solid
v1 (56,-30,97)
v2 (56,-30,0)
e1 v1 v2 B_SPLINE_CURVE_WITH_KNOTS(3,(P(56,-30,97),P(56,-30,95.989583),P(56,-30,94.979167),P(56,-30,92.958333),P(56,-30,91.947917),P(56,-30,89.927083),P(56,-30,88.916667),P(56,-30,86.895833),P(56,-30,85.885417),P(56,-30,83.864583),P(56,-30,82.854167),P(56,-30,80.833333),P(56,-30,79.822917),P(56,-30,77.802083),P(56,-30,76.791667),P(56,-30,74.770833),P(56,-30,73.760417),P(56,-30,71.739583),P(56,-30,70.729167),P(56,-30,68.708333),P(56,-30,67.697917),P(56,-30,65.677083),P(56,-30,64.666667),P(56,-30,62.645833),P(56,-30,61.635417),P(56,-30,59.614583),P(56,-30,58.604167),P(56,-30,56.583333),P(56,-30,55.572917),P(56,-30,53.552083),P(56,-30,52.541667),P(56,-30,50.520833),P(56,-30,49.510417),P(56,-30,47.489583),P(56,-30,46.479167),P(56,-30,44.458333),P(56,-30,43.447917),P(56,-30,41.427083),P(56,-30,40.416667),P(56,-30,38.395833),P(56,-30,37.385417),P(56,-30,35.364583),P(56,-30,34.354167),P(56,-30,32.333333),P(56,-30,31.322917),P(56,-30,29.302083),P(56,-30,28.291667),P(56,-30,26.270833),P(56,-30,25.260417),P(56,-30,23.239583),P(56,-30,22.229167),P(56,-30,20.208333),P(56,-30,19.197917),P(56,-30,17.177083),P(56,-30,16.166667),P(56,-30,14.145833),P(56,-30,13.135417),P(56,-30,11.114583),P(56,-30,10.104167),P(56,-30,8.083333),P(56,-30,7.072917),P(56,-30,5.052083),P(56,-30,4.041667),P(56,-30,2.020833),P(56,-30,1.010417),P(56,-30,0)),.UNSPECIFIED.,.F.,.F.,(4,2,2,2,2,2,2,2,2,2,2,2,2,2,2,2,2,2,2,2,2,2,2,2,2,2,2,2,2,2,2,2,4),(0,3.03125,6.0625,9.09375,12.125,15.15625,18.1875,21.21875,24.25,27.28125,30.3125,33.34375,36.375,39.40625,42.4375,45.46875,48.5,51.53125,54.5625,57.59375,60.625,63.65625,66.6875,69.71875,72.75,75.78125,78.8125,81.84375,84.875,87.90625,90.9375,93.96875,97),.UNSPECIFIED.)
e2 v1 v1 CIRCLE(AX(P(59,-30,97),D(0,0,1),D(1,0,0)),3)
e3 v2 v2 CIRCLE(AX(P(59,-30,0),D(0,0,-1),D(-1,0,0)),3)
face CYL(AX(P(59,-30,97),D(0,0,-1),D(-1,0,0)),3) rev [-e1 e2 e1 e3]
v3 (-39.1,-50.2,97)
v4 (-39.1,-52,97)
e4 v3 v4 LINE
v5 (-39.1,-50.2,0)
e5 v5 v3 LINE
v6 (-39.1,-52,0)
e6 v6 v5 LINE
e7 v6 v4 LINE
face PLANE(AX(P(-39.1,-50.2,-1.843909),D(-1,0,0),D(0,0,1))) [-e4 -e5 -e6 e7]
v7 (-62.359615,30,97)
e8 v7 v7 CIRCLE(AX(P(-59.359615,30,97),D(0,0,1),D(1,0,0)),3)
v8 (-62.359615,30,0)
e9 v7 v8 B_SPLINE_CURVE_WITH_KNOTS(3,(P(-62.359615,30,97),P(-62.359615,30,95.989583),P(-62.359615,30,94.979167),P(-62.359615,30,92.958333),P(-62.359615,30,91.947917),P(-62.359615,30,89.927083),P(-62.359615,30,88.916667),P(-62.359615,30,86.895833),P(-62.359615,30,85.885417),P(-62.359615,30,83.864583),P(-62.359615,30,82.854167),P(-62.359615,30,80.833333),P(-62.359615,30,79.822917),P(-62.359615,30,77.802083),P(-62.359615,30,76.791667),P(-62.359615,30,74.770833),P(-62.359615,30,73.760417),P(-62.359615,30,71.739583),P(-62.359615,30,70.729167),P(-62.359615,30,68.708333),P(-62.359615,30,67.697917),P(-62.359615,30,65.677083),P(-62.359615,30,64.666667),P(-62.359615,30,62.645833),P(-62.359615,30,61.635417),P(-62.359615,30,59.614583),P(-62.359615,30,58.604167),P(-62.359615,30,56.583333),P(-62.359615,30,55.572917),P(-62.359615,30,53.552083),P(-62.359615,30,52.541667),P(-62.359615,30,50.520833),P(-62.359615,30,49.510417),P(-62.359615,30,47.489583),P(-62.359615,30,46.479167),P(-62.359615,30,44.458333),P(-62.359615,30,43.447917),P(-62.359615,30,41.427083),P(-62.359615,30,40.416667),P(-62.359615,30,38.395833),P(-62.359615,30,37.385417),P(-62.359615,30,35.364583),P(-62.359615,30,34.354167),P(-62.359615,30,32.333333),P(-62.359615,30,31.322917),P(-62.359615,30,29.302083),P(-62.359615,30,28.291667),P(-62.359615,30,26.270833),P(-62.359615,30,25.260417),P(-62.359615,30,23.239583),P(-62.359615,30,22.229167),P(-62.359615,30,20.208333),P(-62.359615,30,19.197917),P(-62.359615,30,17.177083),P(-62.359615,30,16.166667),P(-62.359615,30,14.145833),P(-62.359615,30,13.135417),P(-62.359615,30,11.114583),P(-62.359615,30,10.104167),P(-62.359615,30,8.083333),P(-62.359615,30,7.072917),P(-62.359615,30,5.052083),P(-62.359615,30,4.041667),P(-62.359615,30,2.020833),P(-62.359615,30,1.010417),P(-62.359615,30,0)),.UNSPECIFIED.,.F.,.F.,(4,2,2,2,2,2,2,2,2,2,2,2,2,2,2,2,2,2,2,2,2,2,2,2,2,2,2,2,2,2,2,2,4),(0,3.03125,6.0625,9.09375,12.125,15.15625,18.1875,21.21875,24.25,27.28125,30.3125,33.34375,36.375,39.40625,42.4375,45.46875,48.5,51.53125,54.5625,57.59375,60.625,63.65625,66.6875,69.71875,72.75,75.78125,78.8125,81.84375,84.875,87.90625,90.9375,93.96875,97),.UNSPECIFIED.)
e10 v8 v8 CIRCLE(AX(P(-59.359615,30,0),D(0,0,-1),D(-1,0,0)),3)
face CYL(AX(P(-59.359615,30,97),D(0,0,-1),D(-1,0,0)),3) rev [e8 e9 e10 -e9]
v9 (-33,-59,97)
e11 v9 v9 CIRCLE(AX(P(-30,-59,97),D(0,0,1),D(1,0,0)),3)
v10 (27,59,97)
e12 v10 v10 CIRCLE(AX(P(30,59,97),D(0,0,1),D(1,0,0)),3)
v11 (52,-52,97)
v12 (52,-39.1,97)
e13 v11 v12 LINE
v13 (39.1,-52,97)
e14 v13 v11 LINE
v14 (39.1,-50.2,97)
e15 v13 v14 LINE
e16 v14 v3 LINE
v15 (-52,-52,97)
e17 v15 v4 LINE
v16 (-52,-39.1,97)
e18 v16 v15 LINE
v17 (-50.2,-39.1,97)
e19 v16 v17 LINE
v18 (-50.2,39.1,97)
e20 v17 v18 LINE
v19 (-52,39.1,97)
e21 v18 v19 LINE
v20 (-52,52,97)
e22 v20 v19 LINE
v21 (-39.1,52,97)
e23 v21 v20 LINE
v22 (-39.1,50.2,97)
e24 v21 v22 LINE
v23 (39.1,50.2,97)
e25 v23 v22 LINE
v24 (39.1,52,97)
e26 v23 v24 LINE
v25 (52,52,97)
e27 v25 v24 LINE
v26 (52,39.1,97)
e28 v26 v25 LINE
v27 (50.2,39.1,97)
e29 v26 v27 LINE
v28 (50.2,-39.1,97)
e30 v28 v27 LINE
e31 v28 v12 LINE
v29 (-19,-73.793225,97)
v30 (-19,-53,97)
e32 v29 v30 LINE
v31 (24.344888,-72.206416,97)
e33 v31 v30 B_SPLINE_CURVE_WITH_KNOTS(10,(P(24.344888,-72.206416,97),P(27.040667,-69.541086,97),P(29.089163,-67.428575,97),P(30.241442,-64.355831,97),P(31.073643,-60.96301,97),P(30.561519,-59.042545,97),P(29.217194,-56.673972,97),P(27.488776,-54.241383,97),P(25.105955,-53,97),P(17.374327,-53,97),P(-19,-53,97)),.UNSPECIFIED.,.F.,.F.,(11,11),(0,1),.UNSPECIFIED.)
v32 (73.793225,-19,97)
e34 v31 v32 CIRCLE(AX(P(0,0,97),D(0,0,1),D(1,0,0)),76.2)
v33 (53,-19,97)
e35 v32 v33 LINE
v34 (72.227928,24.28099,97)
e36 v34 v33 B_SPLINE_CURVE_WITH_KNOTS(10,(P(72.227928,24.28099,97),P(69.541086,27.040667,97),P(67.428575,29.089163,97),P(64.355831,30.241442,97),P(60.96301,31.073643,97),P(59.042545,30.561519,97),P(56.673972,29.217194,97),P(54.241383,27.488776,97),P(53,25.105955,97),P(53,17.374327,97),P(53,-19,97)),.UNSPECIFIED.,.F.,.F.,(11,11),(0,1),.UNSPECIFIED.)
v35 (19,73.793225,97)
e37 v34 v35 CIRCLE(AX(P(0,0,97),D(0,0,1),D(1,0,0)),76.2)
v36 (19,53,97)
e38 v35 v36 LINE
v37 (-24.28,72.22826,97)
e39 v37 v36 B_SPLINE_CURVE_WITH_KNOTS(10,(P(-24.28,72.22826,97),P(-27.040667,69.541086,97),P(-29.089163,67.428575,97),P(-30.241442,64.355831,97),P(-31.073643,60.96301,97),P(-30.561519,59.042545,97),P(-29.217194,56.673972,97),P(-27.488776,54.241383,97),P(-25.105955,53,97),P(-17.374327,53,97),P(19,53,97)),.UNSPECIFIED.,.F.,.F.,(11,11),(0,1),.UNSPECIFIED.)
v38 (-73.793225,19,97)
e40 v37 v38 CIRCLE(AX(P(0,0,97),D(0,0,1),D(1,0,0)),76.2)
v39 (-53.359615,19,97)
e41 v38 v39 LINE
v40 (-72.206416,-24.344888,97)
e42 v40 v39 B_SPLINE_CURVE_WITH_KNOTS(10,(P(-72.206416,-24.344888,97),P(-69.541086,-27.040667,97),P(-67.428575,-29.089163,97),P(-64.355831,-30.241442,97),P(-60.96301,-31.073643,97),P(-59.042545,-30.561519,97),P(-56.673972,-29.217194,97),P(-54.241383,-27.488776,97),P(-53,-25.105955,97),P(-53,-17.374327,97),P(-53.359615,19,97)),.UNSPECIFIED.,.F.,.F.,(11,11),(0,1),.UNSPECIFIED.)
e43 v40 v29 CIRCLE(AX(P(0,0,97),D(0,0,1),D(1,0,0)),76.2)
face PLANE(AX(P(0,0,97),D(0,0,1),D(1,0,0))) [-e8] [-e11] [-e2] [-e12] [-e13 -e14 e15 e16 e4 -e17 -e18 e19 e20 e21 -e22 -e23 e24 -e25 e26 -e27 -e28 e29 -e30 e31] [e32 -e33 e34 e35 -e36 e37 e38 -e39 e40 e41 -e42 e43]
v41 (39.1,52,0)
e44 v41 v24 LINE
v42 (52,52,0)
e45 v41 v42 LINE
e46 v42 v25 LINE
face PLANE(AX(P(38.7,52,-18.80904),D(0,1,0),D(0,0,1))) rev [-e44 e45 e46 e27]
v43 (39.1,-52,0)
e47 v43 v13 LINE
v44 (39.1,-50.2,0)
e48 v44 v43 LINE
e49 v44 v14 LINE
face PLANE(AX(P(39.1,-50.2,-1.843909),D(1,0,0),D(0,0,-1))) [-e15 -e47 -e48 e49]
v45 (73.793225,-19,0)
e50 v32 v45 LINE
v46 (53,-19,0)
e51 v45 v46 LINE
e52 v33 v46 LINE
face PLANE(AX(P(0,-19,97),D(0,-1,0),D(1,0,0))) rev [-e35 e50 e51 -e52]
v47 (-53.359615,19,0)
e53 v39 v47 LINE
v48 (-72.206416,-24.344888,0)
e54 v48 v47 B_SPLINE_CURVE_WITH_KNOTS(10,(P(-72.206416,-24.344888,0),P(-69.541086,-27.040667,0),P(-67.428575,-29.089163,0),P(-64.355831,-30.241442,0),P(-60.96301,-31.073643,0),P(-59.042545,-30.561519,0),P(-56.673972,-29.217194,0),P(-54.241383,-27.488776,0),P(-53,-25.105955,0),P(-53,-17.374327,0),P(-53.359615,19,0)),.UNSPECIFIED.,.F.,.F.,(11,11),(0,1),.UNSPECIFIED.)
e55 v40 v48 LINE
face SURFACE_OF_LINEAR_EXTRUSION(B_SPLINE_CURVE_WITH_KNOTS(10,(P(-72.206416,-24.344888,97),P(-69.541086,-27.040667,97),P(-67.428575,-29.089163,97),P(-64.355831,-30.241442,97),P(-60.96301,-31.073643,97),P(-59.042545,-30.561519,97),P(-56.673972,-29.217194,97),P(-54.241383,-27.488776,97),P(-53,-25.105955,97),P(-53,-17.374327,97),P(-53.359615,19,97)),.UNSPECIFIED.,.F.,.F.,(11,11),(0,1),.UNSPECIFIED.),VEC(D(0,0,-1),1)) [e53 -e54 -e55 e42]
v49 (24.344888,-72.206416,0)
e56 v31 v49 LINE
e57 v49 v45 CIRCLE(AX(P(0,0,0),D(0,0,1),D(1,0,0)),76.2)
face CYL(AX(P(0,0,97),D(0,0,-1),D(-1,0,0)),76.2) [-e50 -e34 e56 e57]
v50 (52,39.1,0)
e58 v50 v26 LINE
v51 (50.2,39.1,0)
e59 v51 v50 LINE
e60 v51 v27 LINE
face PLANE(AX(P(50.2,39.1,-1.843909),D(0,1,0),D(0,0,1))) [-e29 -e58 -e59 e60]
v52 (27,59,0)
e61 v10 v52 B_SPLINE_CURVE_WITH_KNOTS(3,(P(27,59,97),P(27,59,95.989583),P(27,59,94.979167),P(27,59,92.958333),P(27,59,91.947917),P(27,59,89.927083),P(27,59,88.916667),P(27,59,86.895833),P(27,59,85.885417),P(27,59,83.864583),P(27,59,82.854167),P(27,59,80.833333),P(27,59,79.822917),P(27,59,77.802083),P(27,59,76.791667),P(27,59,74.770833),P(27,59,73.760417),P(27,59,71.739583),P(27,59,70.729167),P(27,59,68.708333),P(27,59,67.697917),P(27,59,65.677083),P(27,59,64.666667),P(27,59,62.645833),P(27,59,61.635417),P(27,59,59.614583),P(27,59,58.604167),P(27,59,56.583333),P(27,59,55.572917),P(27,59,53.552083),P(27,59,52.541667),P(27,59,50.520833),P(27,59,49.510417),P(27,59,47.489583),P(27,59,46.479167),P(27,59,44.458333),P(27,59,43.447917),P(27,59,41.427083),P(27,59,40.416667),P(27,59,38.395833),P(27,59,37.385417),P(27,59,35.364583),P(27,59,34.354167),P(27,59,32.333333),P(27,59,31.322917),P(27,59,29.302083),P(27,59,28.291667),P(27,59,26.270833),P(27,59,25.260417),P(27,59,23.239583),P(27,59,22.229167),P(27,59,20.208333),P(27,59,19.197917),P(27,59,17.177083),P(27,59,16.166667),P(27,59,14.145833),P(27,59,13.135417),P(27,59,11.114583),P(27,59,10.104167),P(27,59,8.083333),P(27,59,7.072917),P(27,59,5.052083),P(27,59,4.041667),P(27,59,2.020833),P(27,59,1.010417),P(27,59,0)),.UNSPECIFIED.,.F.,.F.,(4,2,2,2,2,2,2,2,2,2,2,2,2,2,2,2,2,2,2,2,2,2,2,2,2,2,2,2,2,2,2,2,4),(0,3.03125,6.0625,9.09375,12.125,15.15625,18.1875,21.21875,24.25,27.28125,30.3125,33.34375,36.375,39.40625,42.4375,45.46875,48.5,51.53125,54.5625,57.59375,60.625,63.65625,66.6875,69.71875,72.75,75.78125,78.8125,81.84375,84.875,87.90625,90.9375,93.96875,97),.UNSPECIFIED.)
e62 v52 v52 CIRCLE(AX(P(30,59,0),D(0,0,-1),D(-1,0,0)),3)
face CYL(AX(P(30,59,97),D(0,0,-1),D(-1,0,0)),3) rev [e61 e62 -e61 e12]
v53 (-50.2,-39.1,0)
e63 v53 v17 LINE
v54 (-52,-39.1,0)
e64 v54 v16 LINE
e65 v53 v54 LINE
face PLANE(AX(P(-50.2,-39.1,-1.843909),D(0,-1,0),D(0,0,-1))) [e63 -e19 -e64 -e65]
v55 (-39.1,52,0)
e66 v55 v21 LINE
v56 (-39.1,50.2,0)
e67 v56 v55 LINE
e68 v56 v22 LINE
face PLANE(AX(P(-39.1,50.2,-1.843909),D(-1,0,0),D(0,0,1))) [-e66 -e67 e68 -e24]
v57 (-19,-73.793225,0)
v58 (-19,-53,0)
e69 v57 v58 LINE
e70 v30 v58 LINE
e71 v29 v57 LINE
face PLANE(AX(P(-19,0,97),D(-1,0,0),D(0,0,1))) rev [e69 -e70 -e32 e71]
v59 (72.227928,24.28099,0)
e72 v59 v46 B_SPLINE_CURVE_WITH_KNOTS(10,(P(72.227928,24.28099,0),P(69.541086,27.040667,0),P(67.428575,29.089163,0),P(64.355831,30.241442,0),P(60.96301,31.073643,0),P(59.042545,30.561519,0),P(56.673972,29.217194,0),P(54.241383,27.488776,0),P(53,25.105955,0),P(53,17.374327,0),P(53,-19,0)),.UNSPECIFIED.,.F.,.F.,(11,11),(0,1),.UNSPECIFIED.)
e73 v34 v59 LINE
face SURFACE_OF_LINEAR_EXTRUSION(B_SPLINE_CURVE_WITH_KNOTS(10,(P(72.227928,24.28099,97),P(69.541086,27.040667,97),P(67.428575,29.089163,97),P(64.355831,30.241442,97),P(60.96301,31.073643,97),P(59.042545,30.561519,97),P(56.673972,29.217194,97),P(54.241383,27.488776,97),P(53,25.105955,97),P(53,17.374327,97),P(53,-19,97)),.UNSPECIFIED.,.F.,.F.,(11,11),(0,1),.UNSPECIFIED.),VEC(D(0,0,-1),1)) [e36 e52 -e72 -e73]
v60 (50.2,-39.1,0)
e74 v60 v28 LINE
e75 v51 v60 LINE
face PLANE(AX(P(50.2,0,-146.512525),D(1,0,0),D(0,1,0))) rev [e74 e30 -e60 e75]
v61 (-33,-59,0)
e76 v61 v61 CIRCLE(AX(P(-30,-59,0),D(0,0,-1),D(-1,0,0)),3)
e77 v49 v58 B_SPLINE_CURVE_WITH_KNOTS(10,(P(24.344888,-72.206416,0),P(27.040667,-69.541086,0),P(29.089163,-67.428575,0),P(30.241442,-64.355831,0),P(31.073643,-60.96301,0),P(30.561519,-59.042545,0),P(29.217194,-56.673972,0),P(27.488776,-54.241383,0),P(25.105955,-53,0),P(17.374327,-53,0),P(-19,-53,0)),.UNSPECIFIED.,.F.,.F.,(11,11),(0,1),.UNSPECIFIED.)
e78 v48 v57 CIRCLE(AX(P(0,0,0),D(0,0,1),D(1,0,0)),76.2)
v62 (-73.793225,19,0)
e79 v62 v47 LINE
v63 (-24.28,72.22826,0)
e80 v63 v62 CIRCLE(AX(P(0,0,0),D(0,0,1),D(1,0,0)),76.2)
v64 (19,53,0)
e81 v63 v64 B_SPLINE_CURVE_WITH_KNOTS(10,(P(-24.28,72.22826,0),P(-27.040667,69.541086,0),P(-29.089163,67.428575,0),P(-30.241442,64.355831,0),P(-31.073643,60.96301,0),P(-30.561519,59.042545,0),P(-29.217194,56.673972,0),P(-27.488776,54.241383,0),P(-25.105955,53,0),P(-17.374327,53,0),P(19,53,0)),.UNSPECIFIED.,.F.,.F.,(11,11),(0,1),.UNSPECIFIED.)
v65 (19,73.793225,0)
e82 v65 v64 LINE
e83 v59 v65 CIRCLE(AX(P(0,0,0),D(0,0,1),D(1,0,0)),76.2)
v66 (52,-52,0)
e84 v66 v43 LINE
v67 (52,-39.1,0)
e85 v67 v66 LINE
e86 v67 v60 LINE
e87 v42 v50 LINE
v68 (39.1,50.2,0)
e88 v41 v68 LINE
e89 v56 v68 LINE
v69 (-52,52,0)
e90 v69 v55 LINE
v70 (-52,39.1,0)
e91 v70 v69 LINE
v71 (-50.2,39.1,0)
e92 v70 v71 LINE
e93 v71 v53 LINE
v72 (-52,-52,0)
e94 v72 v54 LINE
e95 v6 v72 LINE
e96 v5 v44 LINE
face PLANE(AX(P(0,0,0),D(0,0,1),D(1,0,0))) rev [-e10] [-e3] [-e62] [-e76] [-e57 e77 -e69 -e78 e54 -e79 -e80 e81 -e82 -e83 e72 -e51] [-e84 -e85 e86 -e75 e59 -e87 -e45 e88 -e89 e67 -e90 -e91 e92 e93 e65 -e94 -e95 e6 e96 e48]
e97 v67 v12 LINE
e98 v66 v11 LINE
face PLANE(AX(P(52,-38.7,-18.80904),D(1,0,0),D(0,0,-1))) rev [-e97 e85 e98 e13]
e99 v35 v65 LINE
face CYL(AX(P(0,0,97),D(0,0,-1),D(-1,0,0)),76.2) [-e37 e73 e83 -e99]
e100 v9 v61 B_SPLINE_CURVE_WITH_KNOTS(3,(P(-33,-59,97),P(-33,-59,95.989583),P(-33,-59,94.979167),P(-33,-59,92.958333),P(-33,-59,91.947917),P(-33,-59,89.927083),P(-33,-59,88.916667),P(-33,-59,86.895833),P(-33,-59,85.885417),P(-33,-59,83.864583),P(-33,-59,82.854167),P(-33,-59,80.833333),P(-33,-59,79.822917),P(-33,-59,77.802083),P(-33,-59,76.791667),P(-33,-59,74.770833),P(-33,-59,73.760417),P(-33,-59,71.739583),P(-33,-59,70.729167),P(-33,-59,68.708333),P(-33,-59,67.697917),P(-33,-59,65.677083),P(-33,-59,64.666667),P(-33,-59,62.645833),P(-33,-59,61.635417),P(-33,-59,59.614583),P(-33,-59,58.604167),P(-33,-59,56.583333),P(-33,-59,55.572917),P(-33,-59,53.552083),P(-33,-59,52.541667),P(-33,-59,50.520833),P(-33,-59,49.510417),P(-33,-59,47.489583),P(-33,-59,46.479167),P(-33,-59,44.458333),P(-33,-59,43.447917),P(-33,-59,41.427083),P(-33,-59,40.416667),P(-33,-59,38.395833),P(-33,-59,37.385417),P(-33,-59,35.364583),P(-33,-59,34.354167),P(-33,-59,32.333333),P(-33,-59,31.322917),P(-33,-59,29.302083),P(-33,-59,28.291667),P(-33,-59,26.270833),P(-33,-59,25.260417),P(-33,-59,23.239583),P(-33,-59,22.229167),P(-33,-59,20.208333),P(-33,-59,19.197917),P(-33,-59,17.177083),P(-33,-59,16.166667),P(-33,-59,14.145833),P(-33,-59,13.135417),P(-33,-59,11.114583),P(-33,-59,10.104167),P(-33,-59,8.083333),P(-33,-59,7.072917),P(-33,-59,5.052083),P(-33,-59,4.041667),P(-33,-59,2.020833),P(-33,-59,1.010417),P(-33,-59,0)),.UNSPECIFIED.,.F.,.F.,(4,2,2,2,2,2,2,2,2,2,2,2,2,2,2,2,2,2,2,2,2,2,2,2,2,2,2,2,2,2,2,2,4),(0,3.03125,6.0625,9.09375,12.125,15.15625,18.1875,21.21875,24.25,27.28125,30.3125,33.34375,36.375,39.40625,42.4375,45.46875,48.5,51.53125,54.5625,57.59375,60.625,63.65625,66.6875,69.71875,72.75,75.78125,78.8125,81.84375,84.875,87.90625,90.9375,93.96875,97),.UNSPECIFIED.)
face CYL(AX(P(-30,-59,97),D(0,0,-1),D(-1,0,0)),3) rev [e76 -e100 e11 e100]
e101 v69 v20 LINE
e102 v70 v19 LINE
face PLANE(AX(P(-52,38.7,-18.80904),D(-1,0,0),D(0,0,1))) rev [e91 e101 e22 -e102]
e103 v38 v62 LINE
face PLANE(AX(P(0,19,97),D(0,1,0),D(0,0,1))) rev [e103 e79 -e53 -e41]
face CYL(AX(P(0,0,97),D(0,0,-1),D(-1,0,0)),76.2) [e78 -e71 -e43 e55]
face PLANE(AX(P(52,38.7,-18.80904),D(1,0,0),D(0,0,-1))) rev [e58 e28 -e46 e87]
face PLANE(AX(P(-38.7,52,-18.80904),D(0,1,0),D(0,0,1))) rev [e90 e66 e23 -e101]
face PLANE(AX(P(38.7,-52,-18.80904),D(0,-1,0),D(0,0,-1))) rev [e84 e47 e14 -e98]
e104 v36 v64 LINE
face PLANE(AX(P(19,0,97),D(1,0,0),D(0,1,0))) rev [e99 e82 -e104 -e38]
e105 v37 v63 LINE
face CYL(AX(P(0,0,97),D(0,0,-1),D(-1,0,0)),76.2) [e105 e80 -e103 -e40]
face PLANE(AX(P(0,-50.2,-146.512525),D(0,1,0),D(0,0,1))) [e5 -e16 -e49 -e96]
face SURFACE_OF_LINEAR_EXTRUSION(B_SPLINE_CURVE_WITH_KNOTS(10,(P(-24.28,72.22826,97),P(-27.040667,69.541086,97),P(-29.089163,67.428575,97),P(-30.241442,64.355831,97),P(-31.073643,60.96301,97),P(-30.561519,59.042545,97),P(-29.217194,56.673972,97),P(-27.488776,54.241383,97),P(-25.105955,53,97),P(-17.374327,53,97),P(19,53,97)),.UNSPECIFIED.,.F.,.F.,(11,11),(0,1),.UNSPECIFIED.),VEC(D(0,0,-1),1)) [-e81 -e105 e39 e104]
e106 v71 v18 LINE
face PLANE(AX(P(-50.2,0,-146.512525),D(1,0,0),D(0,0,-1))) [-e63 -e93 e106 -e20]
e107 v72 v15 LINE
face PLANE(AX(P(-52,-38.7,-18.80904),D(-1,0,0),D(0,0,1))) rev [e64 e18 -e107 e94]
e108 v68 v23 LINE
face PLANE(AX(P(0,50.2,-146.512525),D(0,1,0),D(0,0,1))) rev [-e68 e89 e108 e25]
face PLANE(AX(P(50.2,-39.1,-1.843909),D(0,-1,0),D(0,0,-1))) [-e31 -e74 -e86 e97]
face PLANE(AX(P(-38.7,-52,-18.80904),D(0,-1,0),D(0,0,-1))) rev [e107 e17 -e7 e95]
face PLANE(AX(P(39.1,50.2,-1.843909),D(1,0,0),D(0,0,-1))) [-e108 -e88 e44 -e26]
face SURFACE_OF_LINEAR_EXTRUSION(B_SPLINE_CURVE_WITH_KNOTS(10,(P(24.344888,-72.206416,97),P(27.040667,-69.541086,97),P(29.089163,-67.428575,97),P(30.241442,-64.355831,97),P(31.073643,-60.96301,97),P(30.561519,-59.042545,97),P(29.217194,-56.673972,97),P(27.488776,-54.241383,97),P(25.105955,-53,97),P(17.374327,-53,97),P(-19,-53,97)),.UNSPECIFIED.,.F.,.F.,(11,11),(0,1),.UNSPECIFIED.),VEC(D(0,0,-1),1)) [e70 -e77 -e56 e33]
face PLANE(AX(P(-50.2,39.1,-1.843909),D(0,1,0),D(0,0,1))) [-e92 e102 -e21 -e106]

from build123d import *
from build123d.topology import SkipClean

# Parameters (mm, degrees)
BOSS_EXTRUDE3_OUTLINE_R = 3
BOSS_EXTRUDE3_DEPTH     = 97
SKETCH3_R               = 3
BOSS_EXTRUDE4_DEPTH     = 5
BOSS_EXTRUDE5_OUTLINE_R = 3
BOSS_EXTRUDE5_DEPTH     = 6
CUT_EXTRUDE2_DEPTH      = 6
CUT_EXTRUDE6_DEPTH      = 97
CUT_EXTRUDE9_DEPTH      = 97
SKETCH9_W               = 0.4
SKETCH9_H               = 1.8
SKETCH9_W_2             = 1.8
SKETCH9_H_2             = 0.4
BOSS_EXTRUDE6_DEPTH     = 97
SKETCH6_R               = 6.726787931
SKETCH6_R_2             = 3
SKETCH6_R_3             = 6.939010835
SKETCH6_R_4             = 7.483441293
SKETCH6_R_5             = 7.426515464
BOSS_EXTRUDE9_DEPTH     = 6
BOSS_EXTRUDE8_DEPTH     = 97


# Read off the part's stored shape, not the designer's step: Boss-Extrude3, Boss-Extrude5, Cut-Extrude2
with BuildPart() as part:
    # Boss-Extrude3 outline → Boss-Extrude3 (new body)
    with BuildSketch(Plane.XY):
        with BuildLine():
            ThreePointArc((-24.28, 72.228260397), (-55.793380191, 51.899313356), (-73.793224621, 19))
            Line((-73.793224621, 19), (-53.359615493, 19))
            add(Edge.make_bspline(
                [(-72.206415586, -24.344887517), (-69.541086329, -27.040667073), (-67.428574969, -29.089162938), (-64.355831171, -30.241441862), (-60.963009895, -31.073643307), (-59.042545022, -30.561519341), (-56.673971678, -29.217193929), (-54.241382838, -27.488775543), (-53, -25.105954954), (-53, -17.37432721), (-53.359615493, 19)],
                knots=[0, 0, 0, 0, 0, 0, 0, 0, 0, 0, 0, 1, 1, 1, 1, 1, 1, 1, 1, 1, 1, 1], degree=10))
            ThreePointArc((-72.206415586, -24.344887517), (-51.874242853, -55.816690411), (-19, -73.793224621))
            Line((-19, -73.793224621), (-19, -53))
            add(Edge.make_bspline(
                [(24.344887517, -72.206415586), (27.040667073, -69.541086329), (29.089162938, -67.428574969), (30.241441862, -64.355831171), (31.073643307, -60.963009895), (30.561519341, -59.042545022), (29.217193929, -56.673971678), (27.488775543, -54.241382838), (25.105954954, -53), (17.37432721, -53), (-19, -53)],
                knots=[0, 0, 0, 0, 0, 0, 0, 0, 0, 0, 0, 1, 1, 1, 1, 1, 1, 1, 1, 1, 1, 1], degree=10))
            ThreePointArc((24.344887517, -72.206415586), (55.816690411, -51.874242853), (73.793224621, -19))
            Line((73.793224621, -19), (53, -19))
            add(Edge.make_bspline(
                [(72.227927536, 24.280990174), (69.541086329, 27.040667073), (67.428574969, 29.089162938), (64.355831171, 30.241441862), (60.963009895, 31.073643307), (59.042545022, 30.561519341), (56.673971678, 29.217193929), (54.241382838, 27.488775543), (53, 25.105954954), (53, 17.37432721), (53, -19)],
                knots=[0, 0, 0, 0, 0, 0, 0, 0, 0, 0, 0, 1, 1, 1, 1, 1, 1, 1, 1, 1, 1, 1], degree=10))
            ThreePointArc((72.227927536, 24.280990174), (51.89893092, 55.793735933), (19, 73.793224621))
            Line((19, 73.793224621), (19, 53))
            add(Edge.make_bspline(
                [(-24.28, 72.228260397), (-27.040667073, 69.541086329), (-29.089162938, 67.428574969), (-30.241441862, 64.355831171), (-31.073643307, 60.963009895), (-30.561519341, 59.042545022), (-29.217193929, 56.673971678), (-27.488775543, 54.241382838), (-25.105954954, 53), (-17.37432721, 53), (19, 53)],
                knots=[0, 0, 0, 0, 0, 0, 0, 0, 0, 0, 0, 1, 1, 1, 1, 1, 1, 1, 1, 1, 1, 1], degree=10))
        make_face()
        with Locations((-30, -59)):
            Circle(BOSS_EXTRUDE3_OUTLINE_R, mode=Mode.SUBTRACT)
        Polygon((-38.9, -51.6), (-51.6, -51.6), (-51.6, -38.9), (-50, -38.9), (-50, 38.9), (-51.6, 38.9), (-51.6, 51.6), (-38.9, 51.6), (-38.9, 50), (38.9, 50), (38.9, 51.6), (51.6, 51.6), (51.6, 38.9), (50, 38.9), (50, -38.9), (51.6, -38.9), (51.6, -51.6), (38.9, -51.6), (38.9, -50), (-38.9, -50), align=None, mode=Mode.SUBTRACT)
        with Locations((59, -30)):
            Circle(BOSS_EXTRUDE3_OUTLINE_R, mode=Mode.SUBTRACT)
        with Locations((-59.359615493, 30)):
            Circle(BOSS_EXTRUDE3_OUTLINE_R, mode=Mode.SUBTRACT)
        with Locations((30, 59)):
            Circle(BOSS_EXTRUDE3_OUTLINE_R, mode=Mode.SUBTRACT)
    extrude(amount=BOSS_EXTRUDE3_DEPTH)

    # Sketch3 → Boss-Extrude4 (add)
    with BuildSketch(Plane.XY.offset(97)):
        with Locations(Location((-59.359615493, 30, 0), (0, 0, 180))):
            Circle(SKETCH3_R)
    extrude(amount=BOSS_EXTRUDE4_DEPTH)


with BuildPart() as boss_extrude4_kept_piece:
    # of the separate pieces the step leaves, the one the design keeps (boss_extrude4_pieces_kept)
    add(part.part.solids().sort_by_distance((-24.28, 72.228260397, 0))[0])

    # Boss-Extrude5 outline → Boss-Extrude5 (add)
    with BuildSketch(Plane.XY):
        with Locations((-59.359615493, 30)):
            Circle(BOSS_EXTRUDE5_OUTLINE_R)
    extrude(amount=BOSS_EXTRUDE5_DEPTH)

    # Cut-Extrude2 outline → Cut-Extrude2 (cut)
    with BuildSketch(Plane.XY):
        Polygon((-32.75, -54.236860279), (-35.5, -59), (-32.75, -63.763139721), (-27.25, -63.763139721), (-24.5, -59), (-27.25, -54.236860279), align=None)
        Polygon((59, -24.5), (54.236860279, -27.25), (54.236860279, -32.75), (59, -35.5), (63.763139721, -32.75), (63.763139721, -27.25), align=None)
        Polygon((-59.359615493, 35.5), (-64.122755214, 32.75), (-64.122755214, 27.25), (-59.359615493, 24.5), (-54.596475772, 27.25), (-54.596475772, 32.75), align=None)
        Polygon((32.75, 63.763139721), (27.25, 63.763139721), (24.5, 59), (27.25, 54.236860279), (32.75, 54.236860279), (35.5, 59), align=None)
    extrude(amount=CUT_EXTRUDE2_DEPTH, mode=Mode.SUBTRACT)

    # Sketch7 → Cut-Extrude6 (cut)
    with BuildSketch(Plane.XY.offset(97)):
        Polygon((-38.7, -51.8), (-51.8, -51.8), (-51.8, -38.7), (-50.2, -38.7), (-50.2, 38.7), (-51.8, 38.7), (-51.8, 51.8), (-38.7, 51.8), (-38.7, 50.2), (38.7, 50.2), (38.7, 51.8), (51.8, 51.8), (51.8, 38.7), (50.2, 38.7), (50.2, -38.7), (51.8, -38.7), (51.8, -51.8), (38.7, -51.8), (38.7, -50.2), (-38.7, -50.2), align=None)
        Polygon((-38.9, -51.6), (-51.6, -51.6), (-51.6, -38.9), (-50, -38.9), (-50, 38.9), (-51.6, 38.9), (-51.6, 51.6), (-38.9, 51.6), (-38.9, 50), (38.9, 50), (38.9, 51.6), (51.6, 51.6), (51.6, 38.9), (50, 38.9), (50, -38.9), (51.6, -38.9), (51.6, -51.6), (38.9, -51.6), (38.9, -50), (-38.9, -50), align=None, mode=Mode.SUBTRACT)
    extrude(amount=-CUT_EXTRUDE6_DEPTH, mode=Mode.SUBTRACT)

    # Sketch8 → Cut-Extrude9 (cut)
    with BuildSketch(Plane.XY.offset(97)):
        Polygon((-51.8, 38.7), (-51.8, 51.8), (-38.7, 51.8), (-38.7, 52), (-52, 52), (-52, 38.7), align=None)
        Polygon((-51.8, -38.7), (-51.8, -51.8), (-38.7, -51.8), (-38.7, -52), (-52, -52), (-52, -38.7), align=None)
        Polygon((51.8, -38.7), (51.8, -51.8), (38.7, -51.8), (38.7, -52), (52, -52), (52, -38.7), align=None)
        Polygon((51.8, 38.7), (51.8, 51.8), (38.7, 51.8), (38.7, 52), (52, 52), (52, 38.7), align=None)
    extrude(amount=-CUT_EXTRUDE9_DEPTH, mode=Mode.SUBTRACT)

    # Sketch9 → Boss-Extrude6 (add)
    with BuildSketch(Plane.XY.offset(97)):
        with Locations((-38.9, 51.1)):
            Rectangle(SKETCH9_W, SKETCH9_H)
        with Locations((-51.1, 38.9)):
            Rectangle(SKETCH9_W_2, SKETCH9_H_2)
        with Locations((38.9, 51.1)):
            Rectangle(SKETCH9_W, SKETCH9_H)
        with Locations((51.1, 38.9)):
            Rectangle(SKETCH9_W_2, SKETCH9_H_2)
        with Locations((51.1, -38.9)):
            Rectangle(SKETCH9_W_2, SKETCH9_H_2)
        with Locations((38.9, -51.1)):
            Rectangle(SKETCH9_W, SKETCH9_H)
        with Locations((-51.1, -38.9)):
            Rectangle(SKETCH9_W_2, SKETCH9_H_2)
        with Locations((-38.9, -51.1)):
            Rectangle(SKETCH9_W, SKETCH9_H)
    extrude(amount=-BOSS_EXTRUDE6_DEPTH)

    # Sketch6 → Boss-Extrude9 (add)
    # profile 1 of 4: a face of its own
    with SkipClean():  # the faces are left unmerged after this step: merging them gives an invalid solid
        with BuildSketch(Plane(origin=(0, 0, 0), x_dir=(-1, 0, 0), z_dir=(0, 0, -1))):
            with Locations((-30, 59)):
                Circle(SKETCH6_R)
            with Locations((-30, 59)):
                Circle(SKETCH6_R_2, mode=Mode.SUBTRACT)
        # profile 2 of 4: a face of its own
        with BuildSketch(Plane(origin=(0, 0, 0), x_dir=(-1, 0, 0), z_dir=(0, 0, -1))):
            with Locations((59.359615493, 30)):
                Circle(SKETCH6_R_3)
            with Locations((59.359615493, 30)):
                Circle(SKETCH6_R_2, mode=Mode.SUBTRACT)
        # profile 3 of 4: a face of its own
        with BuildSketch(Plane(origin=(0, 0, 0), x_dir=(-1, 0, 0), z_dir=(0, 0, -1))):
            with Locations((30, -59)):
                Circle(SKETCH6_R_4)
            with Locations((30, -59)):
                Circle(SKETCH6_R_2, mode=Mode.SUBTRACT)
        # profile 4 of 4: a face of its own
        with BuildSketch(Plane(origin=(0, 0, 0), x_dir=(-1, 0, 0), z_dir=(0, 0, -1))):
            with Locations((-59, -30)):
                Circle(SKETCH6_R_5)
            with Locations((-59, -30)):
                Circle(SKETCH6_R_2, mode=Mode.SUBTRACT)
        extrude(amount=-BOSS_EXTRUDE9_DEPTH)

    # Sketch11 → Boss-Extrude8 (add)
    with SkipClean():  # the faces are left unmerged after this step: merging them gives an invalid solid
        with BuildSketch(Plane.XY.offset(97)):
            with BuildLine():
                ThreePointArc((-73.793224621, 19), (-76.148989183, -2.787731402), (-72.206415586, -24.344887517))
                add(Edge.make_bspline(
                    [(-53.359615493, 19), (-53, -17.37432721), (-53, -25.105954954), (-54.241382838, -27.488775543), (-56.673971678, -29.217193929), (-59.042545022, -30.561519341), (-60.963009895, -31.073643307), (-64.355831171, -30.241441862), (-67.428574969, -29.089162938), (-69.541086329, -27.040667073), (-72.206415586, -24.344887517)],
                    knots=[0, 0, 0, 0, 0, 0, 0, 0, 0, 0, 0, 1, 1, 1, 1, 1, 1, 1, 1, 1, 1, 1], degree=10))
                Line((-53.359615493, 19), (-73.793224621, 19))
            make_face()
        extrude(amount=BOSS_EXTRUDE8_DEPTH)


with BuildPart() as boss_extrude8_kept_piece:
    # of the separate pieces the step leaves, the one the design keeps (boss_extrude8_pieces_kept)
    add(boss_extrude4_kept_piece.part.solids().sort_by_distance((-24.28, 72.228260397, 0))[0])


solid = boss_extrude8_kept_piece.part
